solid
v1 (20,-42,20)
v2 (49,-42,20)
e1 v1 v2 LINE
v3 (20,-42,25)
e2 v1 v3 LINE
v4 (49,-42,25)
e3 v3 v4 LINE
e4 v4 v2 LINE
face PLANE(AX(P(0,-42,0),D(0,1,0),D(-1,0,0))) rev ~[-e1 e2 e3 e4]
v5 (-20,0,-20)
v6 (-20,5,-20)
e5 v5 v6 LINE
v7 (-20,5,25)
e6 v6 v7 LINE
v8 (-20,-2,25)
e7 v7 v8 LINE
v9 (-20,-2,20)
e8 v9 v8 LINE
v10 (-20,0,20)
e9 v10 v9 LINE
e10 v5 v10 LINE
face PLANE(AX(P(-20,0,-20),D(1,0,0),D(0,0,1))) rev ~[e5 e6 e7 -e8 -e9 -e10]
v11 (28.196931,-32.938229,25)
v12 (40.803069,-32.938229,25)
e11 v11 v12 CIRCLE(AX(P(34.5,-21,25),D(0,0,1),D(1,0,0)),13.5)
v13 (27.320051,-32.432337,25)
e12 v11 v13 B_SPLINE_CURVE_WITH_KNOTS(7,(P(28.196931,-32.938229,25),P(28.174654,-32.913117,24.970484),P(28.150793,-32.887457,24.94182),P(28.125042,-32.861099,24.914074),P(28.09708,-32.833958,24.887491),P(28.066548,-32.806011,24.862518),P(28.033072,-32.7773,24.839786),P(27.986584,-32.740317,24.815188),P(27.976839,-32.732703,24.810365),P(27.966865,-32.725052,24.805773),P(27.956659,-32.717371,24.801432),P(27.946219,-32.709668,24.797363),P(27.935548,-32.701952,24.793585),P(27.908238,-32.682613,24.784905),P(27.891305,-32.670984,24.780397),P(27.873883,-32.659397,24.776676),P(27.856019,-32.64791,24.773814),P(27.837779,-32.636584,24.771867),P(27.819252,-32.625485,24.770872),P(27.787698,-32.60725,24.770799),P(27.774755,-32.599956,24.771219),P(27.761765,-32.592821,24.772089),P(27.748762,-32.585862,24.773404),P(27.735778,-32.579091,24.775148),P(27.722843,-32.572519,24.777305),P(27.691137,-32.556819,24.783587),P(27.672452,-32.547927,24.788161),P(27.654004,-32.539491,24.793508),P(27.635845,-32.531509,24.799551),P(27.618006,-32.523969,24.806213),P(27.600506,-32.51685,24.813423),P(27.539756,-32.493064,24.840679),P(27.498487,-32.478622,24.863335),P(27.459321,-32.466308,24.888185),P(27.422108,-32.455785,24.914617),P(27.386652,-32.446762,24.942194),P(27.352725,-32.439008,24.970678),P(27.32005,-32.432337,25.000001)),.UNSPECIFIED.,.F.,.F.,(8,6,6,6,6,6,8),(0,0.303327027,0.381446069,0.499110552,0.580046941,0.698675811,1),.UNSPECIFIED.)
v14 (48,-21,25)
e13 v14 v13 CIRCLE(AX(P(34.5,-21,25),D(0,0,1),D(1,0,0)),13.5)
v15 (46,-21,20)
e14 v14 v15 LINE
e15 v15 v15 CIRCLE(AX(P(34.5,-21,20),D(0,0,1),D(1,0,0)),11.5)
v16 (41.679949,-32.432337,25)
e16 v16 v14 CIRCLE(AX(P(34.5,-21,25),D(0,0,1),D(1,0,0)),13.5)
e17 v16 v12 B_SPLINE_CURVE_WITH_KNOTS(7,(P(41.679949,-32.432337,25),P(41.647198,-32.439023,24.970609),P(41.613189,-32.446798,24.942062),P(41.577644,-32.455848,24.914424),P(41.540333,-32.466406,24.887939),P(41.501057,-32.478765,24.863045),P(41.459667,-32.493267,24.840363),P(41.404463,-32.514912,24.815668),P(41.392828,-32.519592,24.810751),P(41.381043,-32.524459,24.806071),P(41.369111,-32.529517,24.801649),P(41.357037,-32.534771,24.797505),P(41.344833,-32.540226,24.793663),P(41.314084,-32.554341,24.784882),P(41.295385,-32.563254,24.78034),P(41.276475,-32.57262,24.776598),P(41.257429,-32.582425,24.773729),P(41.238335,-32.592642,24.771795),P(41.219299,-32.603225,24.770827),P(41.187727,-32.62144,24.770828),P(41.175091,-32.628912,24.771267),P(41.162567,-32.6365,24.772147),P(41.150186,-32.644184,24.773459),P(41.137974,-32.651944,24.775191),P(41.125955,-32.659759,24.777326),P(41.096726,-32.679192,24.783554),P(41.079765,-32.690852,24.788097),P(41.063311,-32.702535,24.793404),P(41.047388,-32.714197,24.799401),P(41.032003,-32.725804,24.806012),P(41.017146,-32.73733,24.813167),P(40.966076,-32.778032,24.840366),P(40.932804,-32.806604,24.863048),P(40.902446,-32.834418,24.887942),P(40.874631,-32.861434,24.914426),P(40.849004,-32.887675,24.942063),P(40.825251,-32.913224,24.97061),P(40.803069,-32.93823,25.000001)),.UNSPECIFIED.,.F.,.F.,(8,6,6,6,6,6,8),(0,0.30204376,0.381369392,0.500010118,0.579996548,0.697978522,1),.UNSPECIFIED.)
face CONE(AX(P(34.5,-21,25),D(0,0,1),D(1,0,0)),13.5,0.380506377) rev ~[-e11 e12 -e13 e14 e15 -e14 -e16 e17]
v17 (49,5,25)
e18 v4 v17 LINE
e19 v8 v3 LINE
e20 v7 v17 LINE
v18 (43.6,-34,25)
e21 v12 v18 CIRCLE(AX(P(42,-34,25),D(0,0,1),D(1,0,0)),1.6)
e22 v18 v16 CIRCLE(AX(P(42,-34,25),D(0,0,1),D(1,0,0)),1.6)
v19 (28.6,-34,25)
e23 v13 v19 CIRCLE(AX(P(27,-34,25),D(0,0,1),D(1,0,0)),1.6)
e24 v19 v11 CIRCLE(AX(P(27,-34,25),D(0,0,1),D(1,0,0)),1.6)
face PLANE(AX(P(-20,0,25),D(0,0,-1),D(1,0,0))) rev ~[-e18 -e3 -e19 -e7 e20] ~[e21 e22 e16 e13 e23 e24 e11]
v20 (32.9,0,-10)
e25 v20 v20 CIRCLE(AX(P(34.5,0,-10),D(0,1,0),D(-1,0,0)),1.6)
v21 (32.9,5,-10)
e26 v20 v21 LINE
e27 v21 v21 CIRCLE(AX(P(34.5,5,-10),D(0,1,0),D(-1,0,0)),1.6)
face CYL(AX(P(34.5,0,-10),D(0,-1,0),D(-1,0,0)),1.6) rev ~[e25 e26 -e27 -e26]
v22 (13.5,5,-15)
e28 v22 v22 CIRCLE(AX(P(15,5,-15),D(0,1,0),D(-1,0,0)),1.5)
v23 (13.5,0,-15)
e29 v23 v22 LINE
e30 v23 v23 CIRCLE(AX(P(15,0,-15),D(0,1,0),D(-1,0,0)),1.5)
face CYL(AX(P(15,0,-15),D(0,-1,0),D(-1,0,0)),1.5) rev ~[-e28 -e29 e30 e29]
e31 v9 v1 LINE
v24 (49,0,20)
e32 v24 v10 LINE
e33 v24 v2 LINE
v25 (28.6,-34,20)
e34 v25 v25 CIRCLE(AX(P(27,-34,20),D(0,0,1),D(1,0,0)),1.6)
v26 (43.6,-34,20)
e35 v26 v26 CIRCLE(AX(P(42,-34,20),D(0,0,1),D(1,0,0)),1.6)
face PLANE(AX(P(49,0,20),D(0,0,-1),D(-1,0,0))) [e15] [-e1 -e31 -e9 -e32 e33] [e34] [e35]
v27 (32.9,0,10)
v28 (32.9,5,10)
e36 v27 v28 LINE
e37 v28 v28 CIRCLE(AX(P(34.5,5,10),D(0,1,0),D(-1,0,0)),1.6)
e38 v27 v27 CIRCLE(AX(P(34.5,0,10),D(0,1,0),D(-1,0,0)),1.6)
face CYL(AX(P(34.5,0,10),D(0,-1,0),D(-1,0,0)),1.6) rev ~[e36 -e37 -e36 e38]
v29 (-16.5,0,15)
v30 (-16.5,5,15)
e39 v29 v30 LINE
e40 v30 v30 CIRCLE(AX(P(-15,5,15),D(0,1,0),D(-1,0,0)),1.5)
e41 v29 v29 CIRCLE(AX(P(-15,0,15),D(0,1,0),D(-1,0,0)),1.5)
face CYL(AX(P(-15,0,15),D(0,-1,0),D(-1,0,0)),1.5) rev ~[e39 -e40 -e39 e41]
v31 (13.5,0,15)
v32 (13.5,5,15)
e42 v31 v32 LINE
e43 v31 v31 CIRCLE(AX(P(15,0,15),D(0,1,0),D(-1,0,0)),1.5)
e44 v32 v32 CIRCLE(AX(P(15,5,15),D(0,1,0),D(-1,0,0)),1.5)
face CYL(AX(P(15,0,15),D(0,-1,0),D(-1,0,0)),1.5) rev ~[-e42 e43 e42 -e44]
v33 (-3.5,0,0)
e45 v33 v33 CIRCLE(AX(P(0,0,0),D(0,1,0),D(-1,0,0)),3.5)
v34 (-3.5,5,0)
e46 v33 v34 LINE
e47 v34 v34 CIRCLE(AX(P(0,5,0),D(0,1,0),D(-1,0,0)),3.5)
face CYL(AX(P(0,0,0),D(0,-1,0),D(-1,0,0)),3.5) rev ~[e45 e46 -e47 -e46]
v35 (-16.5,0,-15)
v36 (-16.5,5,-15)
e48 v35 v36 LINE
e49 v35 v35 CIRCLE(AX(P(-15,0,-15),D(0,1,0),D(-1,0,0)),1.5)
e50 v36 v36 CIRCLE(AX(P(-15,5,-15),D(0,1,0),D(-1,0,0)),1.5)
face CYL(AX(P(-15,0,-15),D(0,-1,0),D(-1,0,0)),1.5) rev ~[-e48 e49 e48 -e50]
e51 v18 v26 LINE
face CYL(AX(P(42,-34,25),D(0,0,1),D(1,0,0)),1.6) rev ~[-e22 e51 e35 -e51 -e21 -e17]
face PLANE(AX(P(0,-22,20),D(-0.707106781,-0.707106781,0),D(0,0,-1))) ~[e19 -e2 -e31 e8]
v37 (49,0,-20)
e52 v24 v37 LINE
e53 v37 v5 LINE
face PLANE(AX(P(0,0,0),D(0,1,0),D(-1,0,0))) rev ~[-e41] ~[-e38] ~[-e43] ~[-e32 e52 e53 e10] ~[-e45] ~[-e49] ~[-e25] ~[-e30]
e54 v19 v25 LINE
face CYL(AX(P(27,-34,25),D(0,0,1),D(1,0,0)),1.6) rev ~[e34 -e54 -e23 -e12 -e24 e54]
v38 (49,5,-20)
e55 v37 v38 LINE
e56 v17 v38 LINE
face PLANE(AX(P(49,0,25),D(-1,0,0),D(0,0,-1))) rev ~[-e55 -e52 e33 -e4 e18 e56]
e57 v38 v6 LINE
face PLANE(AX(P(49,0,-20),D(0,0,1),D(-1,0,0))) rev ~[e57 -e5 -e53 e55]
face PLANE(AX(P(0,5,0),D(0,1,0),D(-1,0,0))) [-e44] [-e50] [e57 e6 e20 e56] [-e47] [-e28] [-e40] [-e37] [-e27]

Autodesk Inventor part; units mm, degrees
ref_plane "YZ Plane" through (0, 0, 0) normal (1, 0, 0) x (0, 1, 0)
ref_plane "XZ Plane" through (0, 0, 0) normal (0, 1, 0) x (-1, 0, 0)
ref_plane "XY Plane" through (0, 0, 0) normal (0, 0, 1) x (1, 0, 0)
sketch "Sketch1" plane through (0, 0, 0) normal (0, 1, 0) x (-1, 0, 0)
  line L0 (-20, 20) -> (20, 20)
  line L1 (20, 20) -> (20, -20)
  line L2 (20, -20) -> (-20, -20)
  line L3 (-20, -20) -> (-20, 20)
  line L4 (-20, 20) -> (20, -20) construction
  line L5 (20, 20) -> (-20, -20) construction
  circle A0 centre (15, -15) radius 1.5
  circle A1 centre (-15, -15) radius 1.5
  circle A2 centre (-15, 15) radius 1.5
  circle A3 centre (15, 15) radius 1.5
  line L6 (15, 15) -> (15, -15) construction
  line L7 (-15, -15) -> (15, -15) construction
  line L8 (-15, -15) -> (-15, 15) construction
  line L9 (-20, 20) -> (-49, 20)
  line L10 (-49, 20) -> (-49, -20)
  line L11 (-49, -20) -> (-20, -20)
  circle A4 centre (0, 0) radius 3.5
  line L12 (20, 20) -> (20, 25)
  line L13 (20, 25) -> (-49, 25)
  line L14 (-49, 25) -> (-49, 20)
  line L15 (-34.5, -20) -> (-34.5, -10) construction
  line L16 (-34.5, -10) -> (-34.5, 10) construction
  circle A5 centre (-34.5, -10) radius 1.6
  circle A6 centre (-34.5, 10) radius 1.6
  dimension "d0" = 40
  dimension "d1" = 40
  dimension "d2" = 30
  dimension "d3" = 3
  dimension "d26" = 7
  dimension "d27" = 29
  dimension "d29" = 5
  dimension "d40" = 10
  dimension "d41" = 20
  dimension "d42" = 3.2
sketch "Sketch1 outline for Extrusion1" plane through (0, 0, 0) normal (0, 1, 0) x (-1, 0, 0)
  line L0 (-49, 25) -> (-49, -20)
  line L1 (-49, -20) -> (20, -20)
  line L2 (20, -20) -> (20, 25)
  line L3 (20, 25) -> (-49, 25)
  circle A0 centre (15, 15) radius 1.5
  circle A1 centre (0, 0) radius 3.5
  circle A2 centre (-34.5, -10) radius 1.6
  circle A3 centre (-15, -15) radius 1.5
  circle A4 centre (15, -15) radius 1.5
  circle A5 centre (-34.5, 10) radius 1.6
  circle A6 centre (-15, 15) radius 1.5
extrude "Extrusion1" add sketch "Sketch1 outline for Extrusion1" along normal blind 5
sketch "Sketch1 outline for Extrusion4" plane through (0, 0, 0) normal (0, 1, 0) x (-1, 0, 0)
  line L0 (-49, 25) -> (-49, 20)
  line L1 (20, 25) -> (-49, 25)
  line L2 (20, 20) -> (20, 25)
  line L3 (-20, 20) -> (20, 20)
  line L4 (-49, 20) -> (-20, 20)
extrude "Extrusion4" add sketch "Sketch1 outline for Extrusion4" against normal blind 42
sketch "Sketch2" plane through (-20, 5, 25) normal (0, 0, 1) x (1, 0, 0)
  line L0 (69, -47) -> (69, 0)
  line L1 (0, 0) -> (69, 0)
  line L2 (0, -47) -> (0, 0)
  line L3 (69, -47) -> (0, -47)
  line L4 (69, -47) -> (40, -47)
  line L5 (40, -47) -> (40, 0)
  line L6 (40, 0) -> (69, 0)
  line L7 (69, 0) -> (69, -47)
  circle A0 centre (54.5, -26) radius 11.5
  line L8 (54.5, -26) -> (54.5, -47) construction
  line L9 (69, -47) -> (0, -47)
  line L10 (43, -32.639528) -> (43, -19.360472)
  line L11 (43, -19.360472) -> (54.5, -12.720944)
  line L12 (54.5, -12.720944) -> (66, -19.360472)
  line L13 (66, -19.360472) -> (66, -32.639528)
  line L14 (66, -32.639528) -> (54.5, -39.279056)
  line L15 (54.5, -39.279056) -> (43, -32.639528)
  line L16 (54.5, -39) -> (62, -39) construction
  line L17 (54.5, -39) -> (47, -39) construction
  circle A1 centre (62, -39) radius 1.6
  circle A2 centre (47, -39) radius 1.6
  point P0 (20, -5)
  point P1 (54.5, -26)
  point P2 (48.75, -35.959292)
  point P3 (60.25, -35.959292)
  point P4 (43, -26)
  point P5 (66, -26)
  point P6 (60.25, -16.040708)
  point P7 (48.75, -16.040708)
  dimension "d32" = 29
  dimension "d33" = 21
  dimension "d34" = 23
  dimension "d37" = 3.2
  dimension "d39" = 8
  dimension "d46" = 15
sketch "Sketch2 outline for Extrusion5" plane through (-20, 5, 25) normal (0, 0, 1) x (1, 0, 0)
  circle A0 centre (62, -39) radius 1.6
  circle A1 centre (47, -39) radius 1.6
  circle A2 centre (54.5, -26) radius 11.5
extrude "Extrusion5" cut sketch "Sketch2 outline for Extrusion5" against normal up to surface (5 mm away)
chamfer "Chamfer4" distance 40 angle 45 1 edges at (-20, -42, 22.5)
chamfer "Chamfer5" distance 2 distance2 5 1 edges at (23, -21, 25)
sketch "Sketch3" plane through (0, 5, 0) normal (0, 1, 0) x (1, 0, 0)
  point P0 (0, 0)
properties part number "Tensioner Top_3DPrint"
